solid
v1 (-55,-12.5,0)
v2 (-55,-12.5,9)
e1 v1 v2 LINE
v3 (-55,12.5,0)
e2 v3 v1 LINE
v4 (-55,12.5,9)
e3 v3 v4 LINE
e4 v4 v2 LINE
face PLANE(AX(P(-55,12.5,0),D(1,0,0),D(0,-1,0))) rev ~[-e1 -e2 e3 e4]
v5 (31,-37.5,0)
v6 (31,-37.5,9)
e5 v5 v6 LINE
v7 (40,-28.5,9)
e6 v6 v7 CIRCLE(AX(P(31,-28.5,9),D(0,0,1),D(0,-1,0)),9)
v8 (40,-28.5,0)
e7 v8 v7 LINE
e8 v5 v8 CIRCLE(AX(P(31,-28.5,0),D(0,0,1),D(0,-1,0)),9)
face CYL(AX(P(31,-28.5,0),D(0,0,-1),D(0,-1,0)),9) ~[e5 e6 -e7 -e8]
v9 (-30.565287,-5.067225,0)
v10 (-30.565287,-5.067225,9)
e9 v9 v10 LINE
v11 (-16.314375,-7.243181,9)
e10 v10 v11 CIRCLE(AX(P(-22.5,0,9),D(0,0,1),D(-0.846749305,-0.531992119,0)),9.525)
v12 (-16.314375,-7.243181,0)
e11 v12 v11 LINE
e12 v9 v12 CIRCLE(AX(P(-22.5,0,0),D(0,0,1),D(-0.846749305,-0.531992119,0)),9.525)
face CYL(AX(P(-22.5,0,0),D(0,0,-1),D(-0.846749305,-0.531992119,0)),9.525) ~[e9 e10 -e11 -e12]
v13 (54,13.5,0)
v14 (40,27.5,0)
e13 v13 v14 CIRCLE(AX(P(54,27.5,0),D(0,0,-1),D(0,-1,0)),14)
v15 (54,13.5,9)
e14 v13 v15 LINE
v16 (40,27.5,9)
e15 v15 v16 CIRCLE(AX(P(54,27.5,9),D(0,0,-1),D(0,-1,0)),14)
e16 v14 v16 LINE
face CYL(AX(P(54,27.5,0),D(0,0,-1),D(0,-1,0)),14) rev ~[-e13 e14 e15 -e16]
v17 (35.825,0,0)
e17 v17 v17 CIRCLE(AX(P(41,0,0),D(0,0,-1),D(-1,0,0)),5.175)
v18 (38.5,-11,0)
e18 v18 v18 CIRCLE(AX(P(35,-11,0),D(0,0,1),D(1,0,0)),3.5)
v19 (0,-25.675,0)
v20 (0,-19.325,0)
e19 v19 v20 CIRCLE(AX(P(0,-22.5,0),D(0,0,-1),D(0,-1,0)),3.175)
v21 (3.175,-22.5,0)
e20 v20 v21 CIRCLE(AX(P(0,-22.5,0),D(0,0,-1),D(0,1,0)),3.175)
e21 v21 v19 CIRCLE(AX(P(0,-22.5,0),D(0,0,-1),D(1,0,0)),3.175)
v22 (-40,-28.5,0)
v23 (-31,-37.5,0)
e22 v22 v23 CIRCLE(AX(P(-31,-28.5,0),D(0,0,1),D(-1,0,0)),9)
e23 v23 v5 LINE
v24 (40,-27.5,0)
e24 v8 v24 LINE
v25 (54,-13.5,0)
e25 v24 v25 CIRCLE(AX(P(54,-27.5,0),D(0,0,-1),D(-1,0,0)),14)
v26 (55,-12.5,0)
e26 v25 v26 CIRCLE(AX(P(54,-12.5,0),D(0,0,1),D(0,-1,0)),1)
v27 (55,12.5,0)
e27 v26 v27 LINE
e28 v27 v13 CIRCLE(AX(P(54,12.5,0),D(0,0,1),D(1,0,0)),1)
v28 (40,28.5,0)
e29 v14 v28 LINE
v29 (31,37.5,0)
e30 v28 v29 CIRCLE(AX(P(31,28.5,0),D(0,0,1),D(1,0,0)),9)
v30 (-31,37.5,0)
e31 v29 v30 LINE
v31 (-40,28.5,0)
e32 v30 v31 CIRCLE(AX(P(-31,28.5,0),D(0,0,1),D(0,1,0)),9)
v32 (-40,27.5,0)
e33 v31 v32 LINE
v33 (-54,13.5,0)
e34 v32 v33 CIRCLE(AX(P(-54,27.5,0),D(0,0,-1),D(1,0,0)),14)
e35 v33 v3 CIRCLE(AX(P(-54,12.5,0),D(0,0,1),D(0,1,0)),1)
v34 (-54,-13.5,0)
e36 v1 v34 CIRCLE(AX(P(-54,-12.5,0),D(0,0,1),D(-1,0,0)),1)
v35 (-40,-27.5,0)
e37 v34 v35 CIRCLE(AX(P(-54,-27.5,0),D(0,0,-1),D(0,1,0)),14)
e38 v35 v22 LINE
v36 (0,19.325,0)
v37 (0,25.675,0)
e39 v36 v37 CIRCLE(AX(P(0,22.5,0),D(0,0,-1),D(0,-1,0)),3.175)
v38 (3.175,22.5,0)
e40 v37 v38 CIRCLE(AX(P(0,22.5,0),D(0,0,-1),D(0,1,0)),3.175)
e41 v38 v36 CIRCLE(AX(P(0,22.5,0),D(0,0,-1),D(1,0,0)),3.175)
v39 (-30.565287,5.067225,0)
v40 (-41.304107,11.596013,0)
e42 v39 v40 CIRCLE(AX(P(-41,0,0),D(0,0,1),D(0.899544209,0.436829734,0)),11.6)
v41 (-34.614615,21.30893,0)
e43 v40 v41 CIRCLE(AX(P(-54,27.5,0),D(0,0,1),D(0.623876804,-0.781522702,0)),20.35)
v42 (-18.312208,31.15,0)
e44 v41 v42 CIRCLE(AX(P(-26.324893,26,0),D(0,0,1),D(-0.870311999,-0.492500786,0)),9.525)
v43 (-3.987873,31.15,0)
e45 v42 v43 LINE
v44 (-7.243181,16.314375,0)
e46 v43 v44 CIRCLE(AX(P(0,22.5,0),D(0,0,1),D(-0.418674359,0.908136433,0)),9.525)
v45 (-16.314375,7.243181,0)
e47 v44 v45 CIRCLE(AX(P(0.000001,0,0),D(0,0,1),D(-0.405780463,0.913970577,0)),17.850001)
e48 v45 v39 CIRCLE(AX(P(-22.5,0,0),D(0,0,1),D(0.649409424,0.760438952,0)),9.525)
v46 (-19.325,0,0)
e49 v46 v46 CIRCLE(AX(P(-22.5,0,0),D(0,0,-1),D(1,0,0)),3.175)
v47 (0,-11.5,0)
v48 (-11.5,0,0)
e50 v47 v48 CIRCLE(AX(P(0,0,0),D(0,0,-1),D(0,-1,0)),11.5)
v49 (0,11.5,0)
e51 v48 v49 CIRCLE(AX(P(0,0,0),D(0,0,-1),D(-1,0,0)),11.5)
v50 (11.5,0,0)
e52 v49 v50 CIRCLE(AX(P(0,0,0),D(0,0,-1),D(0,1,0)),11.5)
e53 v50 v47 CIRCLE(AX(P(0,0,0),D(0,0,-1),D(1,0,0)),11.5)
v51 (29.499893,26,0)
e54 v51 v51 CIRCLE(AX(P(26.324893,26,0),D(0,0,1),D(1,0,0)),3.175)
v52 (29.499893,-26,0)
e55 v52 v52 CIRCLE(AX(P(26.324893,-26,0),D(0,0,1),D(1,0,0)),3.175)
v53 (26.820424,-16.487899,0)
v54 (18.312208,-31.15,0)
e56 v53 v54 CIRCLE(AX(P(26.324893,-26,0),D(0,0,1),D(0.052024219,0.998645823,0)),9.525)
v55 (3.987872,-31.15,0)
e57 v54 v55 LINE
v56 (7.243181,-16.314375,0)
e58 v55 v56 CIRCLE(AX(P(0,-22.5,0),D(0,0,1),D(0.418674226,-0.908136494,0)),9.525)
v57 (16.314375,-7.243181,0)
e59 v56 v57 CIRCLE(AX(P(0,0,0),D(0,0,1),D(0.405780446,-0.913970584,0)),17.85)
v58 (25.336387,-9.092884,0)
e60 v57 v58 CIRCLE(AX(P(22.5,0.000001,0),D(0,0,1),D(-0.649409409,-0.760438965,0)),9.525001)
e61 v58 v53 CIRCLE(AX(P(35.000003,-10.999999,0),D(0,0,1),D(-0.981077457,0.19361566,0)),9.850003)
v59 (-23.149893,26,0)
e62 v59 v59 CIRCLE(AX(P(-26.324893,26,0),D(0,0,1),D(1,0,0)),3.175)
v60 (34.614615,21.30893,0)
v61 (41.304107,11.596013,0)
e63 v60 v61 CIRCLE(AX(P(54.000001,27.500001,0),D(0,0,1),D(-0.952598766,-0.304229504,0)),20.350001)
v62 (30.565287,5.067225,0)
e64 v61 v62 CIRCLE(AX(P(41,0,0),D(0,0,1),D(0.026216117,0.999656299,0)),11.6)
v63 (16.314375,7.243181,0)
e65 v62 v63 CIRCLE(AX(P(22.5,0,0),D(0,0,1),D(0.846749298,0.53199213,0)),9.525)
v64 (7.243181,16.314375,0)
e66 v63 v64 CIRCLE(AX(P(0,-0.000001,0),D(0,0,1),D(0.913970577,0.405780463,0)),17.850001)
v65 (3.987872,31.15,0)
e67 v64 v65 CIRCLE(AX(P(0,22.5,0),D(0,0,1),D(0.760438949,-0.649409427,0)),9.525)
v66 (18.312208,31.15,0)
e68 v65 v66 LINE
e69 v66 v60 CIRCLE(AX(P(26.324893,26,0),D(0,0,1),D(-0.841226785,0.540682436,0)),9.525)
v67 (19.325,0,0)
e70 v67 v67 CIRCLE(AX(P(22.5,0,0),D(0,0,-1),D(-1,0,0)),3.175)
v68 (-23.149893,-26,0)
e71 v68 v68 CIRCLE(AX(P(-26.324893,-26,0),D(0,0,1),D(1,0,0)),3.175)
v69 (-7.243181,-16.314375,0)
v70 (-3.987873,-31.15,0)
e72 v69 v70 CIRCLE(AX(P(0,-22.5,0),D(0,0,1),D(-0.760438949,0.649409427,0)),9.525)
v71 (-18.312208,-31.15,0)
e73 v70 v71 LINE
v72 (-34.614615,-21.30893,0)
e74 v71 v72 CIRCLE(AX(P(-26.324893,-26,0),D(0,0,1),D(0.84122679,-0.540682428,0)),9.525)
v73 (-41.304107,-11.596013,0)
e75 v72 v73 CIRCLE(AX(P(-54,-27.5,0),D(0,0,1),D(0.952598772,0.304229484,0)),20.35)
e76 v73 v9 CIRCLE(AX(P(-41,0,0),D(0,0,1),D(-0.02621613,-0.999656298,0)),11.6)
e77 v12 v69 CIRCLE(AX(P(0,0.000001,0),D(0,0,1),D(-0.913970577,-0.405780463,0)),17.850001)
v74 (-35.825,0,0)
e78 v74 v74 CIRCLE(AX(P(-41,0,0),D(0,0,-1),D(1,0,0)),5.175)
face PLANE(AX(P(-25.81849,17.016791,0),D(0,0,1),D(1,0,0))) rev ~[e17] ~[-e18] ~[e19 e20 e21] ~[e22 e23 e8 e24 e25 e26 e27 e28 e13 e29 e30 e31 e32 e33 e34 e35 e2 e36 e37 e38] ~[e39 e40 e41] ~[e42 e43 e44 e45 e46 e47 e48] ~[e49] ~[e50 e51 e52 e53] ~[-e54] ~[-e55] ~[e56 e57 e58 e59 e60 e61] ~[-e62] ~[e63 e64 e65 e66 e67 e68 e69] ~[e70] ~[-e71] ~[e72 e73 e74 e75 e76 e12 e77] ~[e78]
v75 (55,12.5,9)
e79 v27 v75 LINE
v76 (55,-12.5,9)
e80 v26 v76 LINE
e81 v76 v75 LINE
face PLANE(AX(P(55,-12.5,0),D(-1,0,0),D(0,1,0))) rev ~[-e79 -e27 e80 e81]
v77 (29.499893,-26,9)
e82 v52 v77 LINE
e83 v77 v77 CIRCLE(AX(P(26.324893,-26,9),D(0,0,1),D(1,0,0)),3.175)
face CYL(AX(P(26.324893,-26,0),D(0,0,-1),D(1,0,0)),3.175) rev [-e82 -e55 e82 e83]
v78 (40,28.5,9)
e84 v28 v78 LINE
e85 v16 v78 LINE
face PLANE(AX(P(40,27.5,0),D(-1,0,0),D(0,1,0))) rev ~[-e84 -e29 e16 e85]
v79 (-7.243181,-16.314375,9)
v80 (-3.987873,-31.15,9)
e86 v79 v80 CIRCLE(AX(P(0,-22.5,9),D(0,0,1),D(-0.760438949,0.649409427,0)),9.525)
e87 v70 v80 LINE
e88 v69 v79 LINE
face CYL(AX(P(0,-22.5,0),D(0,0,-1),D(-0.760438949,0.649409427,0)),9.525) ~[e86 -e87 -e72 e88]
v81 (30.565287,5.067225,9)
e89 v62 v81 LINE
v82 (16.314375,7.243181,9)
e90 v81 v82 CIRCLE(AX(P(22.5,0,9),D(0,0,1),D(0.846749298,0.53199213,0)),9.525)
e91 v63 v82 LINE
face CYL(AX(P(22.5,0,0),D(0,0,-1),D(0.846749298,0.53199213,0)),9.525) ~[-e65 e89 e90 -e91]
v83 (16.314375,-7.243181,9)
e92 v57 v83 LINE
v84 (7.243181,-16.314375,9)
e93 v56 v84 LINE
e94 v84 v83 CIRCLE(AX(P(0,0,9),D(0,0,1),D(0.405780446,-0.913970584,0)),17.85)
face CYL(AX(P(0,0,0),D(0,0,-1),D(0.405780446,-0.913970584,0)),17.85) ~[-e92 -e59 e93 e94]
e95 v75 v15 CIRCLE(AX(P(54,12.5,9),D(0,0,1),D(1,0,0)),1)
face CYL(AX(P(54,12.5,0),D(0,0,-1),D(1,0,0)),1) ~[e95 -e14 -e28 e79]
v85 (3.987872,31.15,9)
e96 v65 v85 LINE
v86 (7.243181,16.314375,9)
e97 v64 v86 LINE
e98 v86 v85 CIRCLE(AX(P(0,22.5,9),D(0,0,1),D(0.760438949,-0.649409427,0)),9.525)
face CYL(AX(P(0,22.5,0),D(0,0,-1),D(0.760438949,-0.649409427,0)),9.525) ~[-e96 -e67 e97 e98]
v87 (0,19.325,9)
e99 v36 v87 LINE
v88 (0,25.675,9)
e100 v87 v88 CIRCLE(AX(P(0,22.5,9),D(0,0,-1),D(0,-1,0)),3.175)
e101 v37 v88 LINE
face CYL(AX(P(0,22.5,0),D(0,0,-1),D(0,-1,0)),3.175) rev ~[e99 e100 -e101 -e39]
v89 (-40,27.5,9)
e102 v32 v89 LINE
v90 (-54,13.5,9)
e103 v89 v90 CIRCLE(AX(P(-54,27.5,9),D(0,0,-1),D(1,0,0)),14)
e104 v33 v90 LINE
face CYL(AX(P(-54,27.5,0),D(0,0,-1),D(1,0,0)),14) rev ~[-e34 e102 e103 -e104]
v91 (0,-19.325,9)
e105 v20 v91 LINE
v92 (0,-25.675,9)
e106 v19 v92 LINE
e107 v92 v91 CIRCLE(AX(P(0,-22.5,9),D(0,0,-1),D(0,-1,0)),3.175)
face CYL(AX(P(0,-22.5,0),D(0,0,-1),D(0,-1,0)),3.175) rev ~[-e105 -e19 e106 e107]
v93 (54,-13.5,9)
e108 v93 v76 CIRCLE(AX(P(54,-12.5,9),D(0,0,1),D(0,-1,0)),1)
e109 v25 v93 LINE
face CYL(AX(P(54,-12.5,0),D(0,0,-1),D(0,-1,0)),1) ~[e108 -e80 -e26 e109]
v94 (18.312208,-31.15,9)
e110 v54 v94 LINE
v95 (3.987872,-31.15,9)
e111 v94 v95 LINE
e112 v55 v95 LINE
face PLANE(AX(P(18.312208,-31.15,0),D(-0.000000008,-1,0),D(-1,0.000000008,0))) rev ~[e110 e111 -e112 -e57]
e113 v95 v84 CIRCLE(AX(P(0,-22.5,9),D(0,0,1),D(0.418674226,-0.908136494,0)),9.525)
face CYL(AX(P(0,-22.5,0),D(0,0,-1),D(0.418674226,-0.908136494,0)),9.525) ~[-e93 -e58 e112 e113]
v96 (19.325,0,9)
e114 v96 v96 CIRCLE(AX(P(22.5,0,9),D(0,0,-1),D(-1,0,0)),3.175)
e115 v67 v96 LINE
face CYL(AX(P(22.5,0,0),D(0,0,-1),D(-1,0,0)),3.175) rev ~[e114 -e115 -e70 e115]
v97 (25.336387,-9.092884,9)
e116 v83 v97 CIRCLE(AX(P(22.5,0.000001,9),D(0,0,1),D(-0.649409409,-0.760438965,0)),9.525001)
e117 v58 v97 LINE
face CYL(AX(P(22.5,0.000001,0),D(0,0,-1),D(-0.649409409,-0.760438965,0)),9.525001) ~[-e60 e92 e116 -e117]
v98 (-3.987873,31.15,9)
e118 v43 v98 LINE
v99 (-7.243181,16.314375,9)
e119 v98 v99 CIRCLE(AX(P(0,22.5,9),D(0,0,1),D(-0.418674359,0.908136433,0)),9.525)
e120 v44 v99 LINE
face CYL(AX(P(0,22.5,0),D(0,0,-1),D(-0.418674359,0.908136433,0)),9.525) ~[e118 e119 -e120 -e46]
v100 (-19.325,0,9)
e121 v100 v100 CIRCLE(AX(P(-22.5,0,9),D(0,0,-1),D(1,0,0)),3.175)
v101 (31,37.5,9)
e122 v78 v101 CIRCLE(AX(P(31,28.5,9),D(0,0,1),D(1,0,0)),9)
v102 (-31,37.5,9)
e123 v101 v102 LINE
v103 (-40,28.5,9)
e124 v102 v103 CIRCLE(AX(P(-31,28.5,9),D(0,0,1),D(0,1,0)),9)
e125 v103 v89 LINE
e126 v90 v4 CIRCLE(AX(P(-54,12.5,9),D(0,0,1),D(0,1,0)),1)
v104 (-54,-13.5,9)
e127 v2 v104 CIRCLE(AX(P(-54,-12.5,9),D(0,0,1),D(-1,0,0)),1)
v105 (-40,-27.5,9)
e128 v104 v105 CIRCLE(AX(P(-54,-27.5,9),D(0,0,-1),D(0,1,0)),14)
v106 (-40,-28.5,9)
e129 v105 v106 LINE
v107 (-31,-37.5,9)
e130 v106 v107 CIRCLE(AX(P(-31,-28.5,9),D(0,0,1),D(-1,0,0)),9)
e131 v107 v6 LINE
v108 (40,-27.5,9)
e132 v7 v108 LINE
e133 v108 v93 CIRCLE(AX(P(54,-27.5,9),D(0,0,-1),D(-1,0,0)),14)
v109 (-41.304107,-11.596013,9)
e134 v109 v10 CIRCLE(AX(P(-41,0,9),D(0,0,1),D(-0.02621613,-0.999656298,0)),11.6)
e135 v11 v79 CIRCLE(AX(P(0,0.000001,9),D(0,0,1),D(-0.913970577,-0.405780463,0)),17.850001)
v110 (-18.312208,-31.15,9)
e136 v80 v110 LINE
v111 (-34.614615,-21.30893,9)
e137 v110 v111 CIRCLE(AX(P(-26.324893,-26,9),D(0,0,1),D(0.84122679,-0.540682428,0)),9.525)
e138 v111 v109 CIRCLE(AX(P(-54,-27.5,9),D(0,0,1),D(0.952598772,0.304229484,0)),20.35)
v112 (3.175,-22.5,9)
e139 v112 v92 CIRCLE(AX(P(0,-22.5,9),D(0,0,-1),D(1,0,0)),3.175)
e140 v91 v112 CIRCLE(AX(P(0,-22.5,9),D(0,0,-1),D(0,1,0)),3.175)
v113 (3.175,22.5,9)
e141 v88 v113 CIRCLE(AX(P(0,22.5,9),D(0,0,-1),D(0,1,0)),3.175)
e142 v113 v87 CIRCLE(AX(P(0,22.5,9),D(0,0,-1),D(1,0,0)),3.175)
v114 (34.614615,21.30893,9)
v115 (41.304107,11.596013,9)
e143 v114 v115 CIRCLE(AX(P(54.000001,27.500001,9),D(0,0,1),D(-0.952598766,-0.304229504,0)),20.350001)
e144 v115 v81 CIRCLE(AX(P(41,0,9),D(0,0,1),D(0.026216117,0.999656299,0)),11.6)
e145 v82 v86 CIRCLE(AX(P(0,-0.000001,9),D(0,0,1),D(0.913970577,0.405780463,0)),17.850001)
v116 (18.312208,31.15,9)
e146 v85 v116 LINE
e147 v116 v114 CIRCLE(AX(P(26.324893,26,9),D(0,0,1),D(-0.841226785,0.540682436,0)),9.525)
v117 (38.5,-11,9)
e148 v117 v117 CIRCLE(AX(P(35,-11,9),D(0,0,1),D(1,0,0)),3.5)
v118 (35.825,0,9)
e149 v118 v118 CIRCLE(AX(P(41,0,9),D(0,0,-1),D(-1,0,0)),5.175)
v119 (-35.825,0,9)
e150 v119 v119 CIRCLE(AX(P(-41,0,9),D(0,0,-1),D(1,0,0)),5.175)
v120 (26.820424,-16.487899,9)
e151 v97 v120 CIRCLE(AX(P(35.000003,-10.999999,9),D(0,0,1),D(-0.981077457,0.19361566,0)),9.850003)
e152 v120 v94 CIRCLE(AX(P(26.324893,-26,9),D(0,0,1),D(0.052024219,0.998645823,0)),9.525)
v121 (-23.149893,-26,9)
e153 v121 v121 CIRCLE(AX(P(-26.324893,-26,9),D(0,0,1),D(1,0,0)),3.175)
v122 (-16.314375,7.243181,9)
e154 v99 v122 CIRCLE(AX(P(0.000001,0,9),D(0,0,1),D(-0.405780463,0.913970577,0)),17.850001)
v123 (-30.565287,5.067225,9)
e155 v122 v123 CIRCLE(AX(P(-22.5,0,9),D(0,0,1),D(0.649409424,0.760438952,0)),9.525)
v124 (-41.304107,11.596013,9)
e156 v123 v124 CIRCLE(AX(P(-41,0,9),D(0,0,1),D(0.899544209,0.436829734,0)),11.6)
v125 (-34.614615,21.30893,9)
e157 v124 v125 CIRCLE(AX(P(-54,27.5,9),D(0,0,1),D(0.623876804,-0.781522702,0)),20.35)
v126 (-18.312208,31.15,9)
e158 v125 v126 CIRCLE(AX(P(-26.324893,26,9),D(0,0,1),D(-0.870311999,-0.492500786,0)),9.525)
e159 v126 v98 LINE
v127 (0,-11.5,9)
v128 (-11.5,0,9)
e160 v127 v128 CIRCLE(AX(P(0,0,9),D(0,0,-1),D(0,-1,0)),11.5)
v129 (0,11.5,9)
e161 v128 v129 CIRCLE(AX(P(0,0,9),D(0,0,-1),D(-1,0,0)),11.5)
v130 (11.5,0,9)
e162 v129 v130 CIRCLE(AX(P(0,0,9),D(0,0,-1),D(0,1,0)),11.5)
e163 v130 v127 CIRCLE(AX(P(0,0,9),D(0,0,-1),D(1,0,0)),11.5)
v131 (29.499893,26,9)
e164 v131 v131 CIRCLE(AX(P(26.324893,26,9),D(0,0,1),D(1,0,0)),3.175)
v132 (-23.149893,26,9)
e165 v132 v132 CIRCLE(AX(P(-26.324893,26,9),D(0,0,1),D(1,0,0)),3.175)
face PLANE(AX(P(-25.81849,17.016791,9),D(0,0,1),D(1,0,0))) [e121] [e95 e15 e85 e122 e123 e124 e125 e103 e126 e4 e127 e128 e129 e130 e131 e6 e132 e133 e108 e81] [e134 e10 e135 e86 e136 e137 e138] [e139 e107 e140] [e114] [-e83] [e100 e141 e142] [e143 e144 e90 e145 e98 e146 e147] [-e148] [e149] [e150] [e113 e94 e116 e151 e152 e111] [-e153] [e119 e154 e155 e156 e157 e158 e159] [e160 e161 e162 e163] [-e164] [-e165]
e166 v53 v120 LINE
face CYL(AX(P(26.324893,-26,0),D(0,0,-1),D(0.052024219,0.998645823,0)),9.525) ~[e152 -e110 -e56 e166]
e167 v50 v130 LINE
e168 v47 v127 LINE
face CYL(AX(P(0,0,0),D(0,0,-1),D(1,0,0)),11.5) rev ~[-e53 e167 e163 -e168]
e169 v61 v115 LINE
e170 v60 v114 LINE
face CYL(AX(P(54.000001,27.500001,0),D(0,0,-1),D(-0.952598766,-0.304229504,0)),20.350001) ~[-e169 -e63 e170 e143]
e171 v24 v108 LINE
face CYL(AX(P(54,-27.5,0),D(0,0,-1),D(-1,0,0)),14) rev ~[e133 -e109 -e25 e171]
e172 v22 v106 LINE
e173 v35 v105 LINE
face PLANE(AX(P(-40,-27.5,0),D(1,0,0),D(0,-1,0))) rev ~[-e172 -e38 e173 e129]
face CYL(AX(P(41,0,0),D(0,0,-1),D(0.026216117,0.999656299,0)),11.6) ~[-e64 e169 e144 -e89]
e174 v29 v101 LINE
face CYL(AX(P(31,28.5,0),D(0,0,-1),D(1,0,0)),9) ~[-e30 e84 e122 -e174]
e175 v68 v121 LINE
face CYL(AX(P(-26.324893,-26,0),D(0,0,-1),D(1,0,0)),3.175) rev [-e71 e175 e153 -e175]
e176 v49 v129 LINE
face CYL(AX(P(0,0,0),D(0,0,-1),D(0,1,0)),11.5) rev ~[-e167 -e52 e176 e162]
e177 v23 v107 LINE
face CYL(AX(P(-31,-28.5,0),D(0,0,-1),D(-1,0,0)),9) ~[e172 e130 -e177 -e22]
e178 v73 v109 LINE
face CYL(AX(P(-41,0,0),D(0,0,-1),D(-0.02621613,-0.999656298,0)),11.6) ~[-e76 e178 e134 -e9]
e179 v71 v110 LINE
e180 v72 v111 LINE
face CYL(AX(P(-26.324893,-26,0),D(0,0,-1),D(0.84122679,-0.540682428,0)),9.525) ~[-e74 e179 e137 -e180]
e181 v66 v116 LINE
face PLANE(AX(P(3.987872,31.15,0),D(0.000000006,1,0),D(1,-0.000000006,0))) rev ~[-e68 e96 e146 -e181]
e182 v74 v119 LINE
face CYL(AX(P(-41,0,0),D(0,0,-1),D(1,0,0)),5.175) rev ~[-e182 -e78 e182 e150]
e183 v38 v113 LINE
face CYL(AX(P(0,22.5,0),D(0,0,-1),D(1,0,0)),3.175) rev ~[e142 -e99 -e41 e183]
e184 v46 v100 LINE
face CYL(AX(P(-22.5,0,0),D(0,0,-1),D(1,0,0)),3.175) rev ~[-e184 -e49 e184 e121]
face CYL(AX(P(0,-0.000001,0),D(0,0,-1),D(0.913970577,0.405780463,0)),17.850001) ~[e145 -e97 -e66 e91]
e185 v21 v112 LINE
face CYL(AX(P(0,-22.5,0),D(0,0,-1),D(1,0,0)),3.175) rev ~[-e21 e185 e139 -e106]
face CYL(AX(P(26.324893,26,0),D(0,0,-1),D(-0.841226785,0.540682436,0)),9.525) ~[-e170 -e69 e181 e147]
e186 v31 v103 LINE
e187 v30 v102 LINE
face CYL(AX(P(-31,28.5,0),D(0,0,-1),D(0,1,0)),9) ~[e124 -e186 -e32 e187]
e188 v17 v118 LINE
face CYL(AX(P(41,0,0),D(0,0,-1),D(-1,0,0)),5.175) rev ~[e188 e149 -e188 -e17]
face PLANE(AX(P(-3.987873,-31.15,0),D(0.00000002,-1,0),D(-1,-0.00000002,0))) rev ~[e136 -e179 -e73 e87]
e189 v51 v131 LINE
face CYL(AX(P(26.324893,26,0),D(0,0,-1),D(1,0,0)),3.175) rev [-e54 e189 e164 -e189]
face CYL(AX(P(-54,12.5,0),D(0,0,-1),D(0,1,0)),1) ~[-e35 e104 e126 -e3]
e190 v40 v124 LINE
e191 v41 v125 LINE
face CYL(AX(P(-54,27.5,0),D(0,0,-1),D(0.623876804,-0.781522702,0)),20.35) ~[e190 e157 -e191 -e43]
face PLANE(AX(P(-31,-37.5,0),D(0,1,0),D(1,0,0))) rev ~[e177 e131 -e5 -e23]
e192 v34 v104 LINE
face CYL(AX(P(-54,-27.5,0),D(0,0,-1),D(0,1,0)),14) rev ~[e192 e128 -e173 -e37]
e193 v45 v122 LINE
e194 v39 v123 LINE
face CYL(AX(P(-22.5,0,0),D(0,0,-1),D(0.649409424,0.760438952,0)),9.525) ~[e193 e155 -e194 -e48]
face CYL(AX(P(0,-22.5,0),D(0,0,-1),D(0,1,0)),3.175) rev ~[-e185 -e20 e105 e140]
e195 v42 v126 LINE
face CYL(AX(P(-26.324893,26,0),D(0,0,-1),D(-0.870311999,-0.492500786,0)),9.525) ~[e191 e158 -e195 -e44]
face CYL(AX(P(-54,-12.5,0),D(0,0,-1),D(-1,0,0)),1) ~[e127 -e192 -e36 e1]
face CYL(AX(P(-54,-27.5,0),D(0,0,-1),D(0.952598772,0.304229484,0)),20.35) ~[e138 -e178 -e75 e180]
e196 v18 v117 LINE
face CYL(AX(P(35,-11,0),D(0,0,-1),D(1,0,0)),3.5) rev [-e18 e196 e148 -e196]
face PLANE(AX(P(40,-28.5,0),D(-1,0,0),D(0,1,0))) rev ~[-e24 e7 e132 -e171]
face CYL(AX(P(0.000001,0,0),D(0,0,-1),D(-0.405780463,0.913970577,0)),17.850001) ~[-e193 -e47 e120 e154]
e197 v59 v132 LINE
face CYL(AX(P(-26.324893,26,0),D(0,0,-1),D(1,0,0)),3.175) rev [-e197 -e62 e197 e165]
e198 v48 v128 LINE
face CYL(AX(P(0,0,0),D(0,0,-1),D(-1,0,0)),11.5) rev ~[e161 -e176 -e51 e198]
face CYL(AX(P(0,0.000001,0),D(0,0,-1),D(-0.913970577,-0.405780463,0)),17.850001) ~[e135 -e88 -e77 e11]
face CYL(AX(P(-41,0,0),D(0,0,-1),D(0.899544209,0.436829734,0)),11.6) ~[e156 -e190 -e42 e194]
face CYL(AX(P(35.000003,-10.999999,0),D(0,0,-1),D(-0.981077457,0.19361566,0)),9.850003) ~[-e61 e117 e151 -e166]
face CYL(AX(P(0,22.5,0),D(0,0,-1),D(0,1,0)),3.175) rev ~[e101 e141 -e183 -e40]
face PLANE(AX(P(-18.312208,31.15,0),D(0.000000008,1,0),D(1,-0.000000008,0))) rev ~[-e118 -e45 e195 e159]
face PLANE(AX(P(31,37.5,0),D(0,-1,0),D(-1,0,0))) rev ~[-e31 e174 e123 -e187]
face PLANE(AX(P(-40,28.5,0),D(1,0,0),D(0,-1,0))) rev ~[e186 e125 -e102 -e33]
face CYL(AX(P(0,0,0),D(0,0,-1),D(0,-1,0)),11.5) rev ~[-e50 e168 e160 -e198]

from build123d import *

# Parameters (mm, degrees)
F0_R     = 3.175
F0_R_2   = 3.5
F1_DEPTH = 9


# Not quite as in the source:
# - ends of sketch curves that miss each other by under 0.0002 mm in the source are joined


with BuildPart() as f1:
    # F0 (on Top) → F1 (new body)
    with BuildSketch(Plane.XY):
        with BuildLine():
            Line((0, 25.675), (0, 37.5))
            Line((0, 37.5), (-31, 37.5))
            ThreePointArc((-31, 37.5), (-37.3639610307, 34.8639610307), (-40, 28.5))
            Line((-40, 28.5), (-40, 27.5))
            ThreePointArc((-40, 27.5), (-44.1005050634, 17.6005050634), (-54, 13.5))
            ThreePointArc((-54, 13.5), (-54.7071067812, 13.2071067812), (-55, 12.5))
            Line((-55, 12.5), (-55, 0))
            Line((-55, 0), (-46.175, 0))
            ThreePointArc((-46.175, 0), (-41, 5.175), (-35.825, 0))
            Line((-35.825, 0), (-25.675, 0))
            ThreePointArc((-25.675, 0), (-22.5, 3.175), (-19.325, 0))
            Line((-19.325, 0), (-11.5, 0))
            ThreePointArc((-11.5, 0), (-8.1317279836, 8.1317279836), (0, 11.5))
            Line((0, 11.5), (0, 19.325))
            ThreePointArc((0, 19.325), (-3.175, 22.5), (0, 25.675))
        make_face()
        with BuildLine():
            ThreePointArc((-30.5652871781, 5.0672249135), (-34.9739264655, 9.9119341078), (-41.3041070016, 11.5960130619))
            ThreePointArc((-41.3041070016, 11.5960130619), (-37.2403076286, 15.9572441931), (-34.6146149846, 21.3089299951))
            ThreePointArc((-34.6146149846, 21.3089299951), (-21.4024086548, 17.845567287), (-18.3122078194, 31.1500001161))
            Line((-18.3122078194, 31.1500001161), (-3.987873, 31.15))
            ThreePointArc((-3.987873, 31.15), (-9.3036595822, 24.5414561908), (-7.2431808946, 16.31437509))
            ThreePointArc((-7.2431808946, 16.31437509), (-12.6218560442, 12.6218560442), (-16.3143749324, 7.24318097))
            ThreePointArc((-16.3143749324, 7.24318097), (-23.9376990029, 9.4158720561), (-30.5652871781, 5.0672249135))
        make_face(mode=Mode.SUBTRACT)
        with Locations((-26.324893, 26)):
            Circle(F0_R, mode=Mode.SUBTRACT)
        with BuildLine():
            ThreePointArc((0, -11.5), (-8.1317279836, -8.1317279836), (-11.5, 0))
            Line((-11.5, 0), (-19.325, 0))
            ThreePointArc((-19.325, 0), (-22.5, -3.175), (-25.675, 0))
            Line((-25.675, 0), (-35.825, 0))
            ThreePointArc((-35.825, 0), (-41, -5.175), (-46.175, 0))
            Line((-46.175, 0), (-55, 0))
            Line((-55, 0), (-55, -12.5))
            ThreePointArc((-55, -12.5), (-54.7071067812, -13.2071067812), (-54, -13.5))
            ThreePointArc((-54, -13.5), (-44.1005050634, -17.6005050634), (-40, -27.5))
            Line((-40, -27.5), (-40, -28.5))
            ThreePointArc((-40, -28.5), (-37.3639610307, -34.8639610307), (-31, -37.5))
            Line((-31, -37.5), (0, -37.5))
            Line((0, -37.5), (0, -25.675))
            ThreePointArc((0, -25.675), (-3.175, -22.5), (0, -19.325))
            Line((0, -19.325), (0, -11.5))
        make_face()
        with Locations((-26.324893, -26)):
            Circle(F0_R, mode=Mode.SUBTRACT)
        with BuildLine():
            ThreePointArc((-34.6146149846, -21.3089299951), (-37.2403076286, -15.9572441931), (-41.304107024, -11.59601303))
            ThreePointArc((-41.304107024, -11.59601303), (-34.9739264655, -9.9119341078), (-30.5652871781, -5.0672249135))
            ThreePointArc((-30.5652871781, -5.0672249135), (-23.9376990029, -9.4158720561), (-16.31437509, -7.2431808946))
            ThreePointArc((-16.31437509, -7.2431808946), (-12.6218560442, -12.6218560442), (-7.24318097, -16.3143749324))
            ThreePointArc((-7.24318097, -16.3143749324), (-9.3036595822, -24.5414561908), (-3.9878728667, -31.1499997109))
            Line((-3.9878728667, -31.1499997109), (-18.312208, -31.15))
            ThreePointArc((-18.312208, -31.15), (-21.4024086548, -17.845567287), (-34.6146149846, -21.3089299951))
        make_face(mode=Mode.SUBTRACT)
        with BuildLine():
            Line((19.325, 0), (11.5, 0))
            ThreePointArc((11.5, 0), (8.1317279836, -8.1317279836), (0, -11.5))
            Line((0, -11.5), (0, -19.325))
            ThreePointArc((0, -19.325), (2.2450640303, -20.2549359697), (3.175, -22.5))
            ThreePointArc((3.175, -22.5), (2.2450640303, -24.7450640303), (0, -25.675))
            Line((0, -25.675), (0, -37.5))
            Line((0, -37.5), (31, -37.5))
            ThreePointArc((31, -37.5), (37.3639610307, -34.8639610307), (40, -28.5))
            Line((40, -28.5), (40, -27.5))
            ThreePointArc((40, -27.5), (44.1005050634, -17.6005050634), (54, -13.5))
            ThreePointArc((54, -13.5), (54.7071067812, -13.2071067812), (55, -12.5))
            Line((55, -12.5), (55, 0))
            Line((55, 0), (46.175, 0))
            ThreePointArc((46.175, 0), (41, -5.175), (35.825, 0))
            Line((35.825, 0), (25.675, 0))
            ThreePointArc((25.675, 0), (22.5, -3.175), (19.325, 0))
        make_face()
        with Locations((26.324893, -26)):
            Circle(F0_R, mode=Mode.SUBTRACT)
        with BuildLine():
            ThreePointArc((7.24318097, -16.3143749324), (12.6218560442, -12.6218560442), (16.3143749324, -7.24318097))
            ThreePointArc((16.3143749324, -7.24318097), (20.5869660419, -9.3309123924), (25.3363869117, -9.0928837168))
            ThreePointArc((25.3363869117, -9.0928837168), (25.3425465049, -12.93806398), (26.8204236463, -16.4878985664))
            ThreePointArc((26.8204236463, -16.4878985664), (18.0864944073, -21.2193710008), (18.3122078194, -31.1500001161))
            Line((18.3122078194, -31.1500001161), (3.987872, -31.15))
            ThreePointArc((3.987872, -31.15), (9.3036594849, -24.5414566343), (7.24318097, -16.3143749324))
        make_face(mode=Mode.SUBTRACT)
        with Locations((35, -11)):
            Circle(F0_R_2, mode=Mode.SUBTRACT)
        with BuildLine():
            Line((31, 37.5), (0, 37.5))
            Line((0, 37.5), (0, 25.675))
            ThreePointArc((0, 25.675), (2.2450640303, 24.7450640303), (3.175, 22.5))
            ThreePointArc((3.175, 22.5), (2.2450640303, 20.2549359697), (0, 19.325))
            Line((0, 19.325), (0, 11.5))
            ThreePointArc((0, 11.5), (8.1317279836, 8.1317279836), (11.5, 0))
            Line((11.5, 0), (19.325, 0))
            ThreePointArc((19.325, 0), (22.5, 3.175), (25.675, 0))
            Line((25.675, 0), (35.825, 0))
            ThreePointArc((35.825, 0), (41, 5.175), (46.175, 0))
            Line((46.175, 0), (55, 0))
            Line((55, 0), (55, 12.5))
            ThreePointArc((55, 12.5), (54.7071067812, 13.2071067812), (54, 13.5))
            ThreePointArc((54, 13.5), (44.1005050634, 17.6005050634), (40, 27.5))
            Line((40, 27.5), (40, 28.5))
            ThreePointArc((40, 28.5), (37.3639610307, 34.8639610307), (31, 37.5))
        make_face()
        with BuildLine():
            ThreePointArc((30.5652870625, 5.0672250393), (23.9376990029, 9.4158720561), (16.31437509, 7.2431808946))
            ThreePointArc((16.31437509, 7.2431808946), (12.6218560442, 12.6218560442), (7.24318097, 16.3143749324))
            ThreePointArc((7.24318097, 16.3143749324), (9.3036594849, 24.5414566343), (3.987872042, 31.1500000911))
            Line((3.987872042, 31.1500000911), (18.312208, 31.15))
            ThreePointArc((18.312208, 31.15), (21.4024086548, 17.845567287), (34.6146148363, 21.3089300926))
            ThreePointArc((34.6146148363, 21.3089300926), (37.2403076286, 15.9572441931), (41.304107024, 11.59601303))
            ThreePointArc((41.304107024, 11.59601303), (34.9739264655, 9.9119341078), (30.5652870625, 5.0672250393))
        make_face(mode=Mode.SUBTRACT)
        with Locations((26.324893, 26)):
            Circle(F0_R, mode=Mode.SUBTRACT)
    extrude(amount=F1_DEPTH)


solid = f1.part
